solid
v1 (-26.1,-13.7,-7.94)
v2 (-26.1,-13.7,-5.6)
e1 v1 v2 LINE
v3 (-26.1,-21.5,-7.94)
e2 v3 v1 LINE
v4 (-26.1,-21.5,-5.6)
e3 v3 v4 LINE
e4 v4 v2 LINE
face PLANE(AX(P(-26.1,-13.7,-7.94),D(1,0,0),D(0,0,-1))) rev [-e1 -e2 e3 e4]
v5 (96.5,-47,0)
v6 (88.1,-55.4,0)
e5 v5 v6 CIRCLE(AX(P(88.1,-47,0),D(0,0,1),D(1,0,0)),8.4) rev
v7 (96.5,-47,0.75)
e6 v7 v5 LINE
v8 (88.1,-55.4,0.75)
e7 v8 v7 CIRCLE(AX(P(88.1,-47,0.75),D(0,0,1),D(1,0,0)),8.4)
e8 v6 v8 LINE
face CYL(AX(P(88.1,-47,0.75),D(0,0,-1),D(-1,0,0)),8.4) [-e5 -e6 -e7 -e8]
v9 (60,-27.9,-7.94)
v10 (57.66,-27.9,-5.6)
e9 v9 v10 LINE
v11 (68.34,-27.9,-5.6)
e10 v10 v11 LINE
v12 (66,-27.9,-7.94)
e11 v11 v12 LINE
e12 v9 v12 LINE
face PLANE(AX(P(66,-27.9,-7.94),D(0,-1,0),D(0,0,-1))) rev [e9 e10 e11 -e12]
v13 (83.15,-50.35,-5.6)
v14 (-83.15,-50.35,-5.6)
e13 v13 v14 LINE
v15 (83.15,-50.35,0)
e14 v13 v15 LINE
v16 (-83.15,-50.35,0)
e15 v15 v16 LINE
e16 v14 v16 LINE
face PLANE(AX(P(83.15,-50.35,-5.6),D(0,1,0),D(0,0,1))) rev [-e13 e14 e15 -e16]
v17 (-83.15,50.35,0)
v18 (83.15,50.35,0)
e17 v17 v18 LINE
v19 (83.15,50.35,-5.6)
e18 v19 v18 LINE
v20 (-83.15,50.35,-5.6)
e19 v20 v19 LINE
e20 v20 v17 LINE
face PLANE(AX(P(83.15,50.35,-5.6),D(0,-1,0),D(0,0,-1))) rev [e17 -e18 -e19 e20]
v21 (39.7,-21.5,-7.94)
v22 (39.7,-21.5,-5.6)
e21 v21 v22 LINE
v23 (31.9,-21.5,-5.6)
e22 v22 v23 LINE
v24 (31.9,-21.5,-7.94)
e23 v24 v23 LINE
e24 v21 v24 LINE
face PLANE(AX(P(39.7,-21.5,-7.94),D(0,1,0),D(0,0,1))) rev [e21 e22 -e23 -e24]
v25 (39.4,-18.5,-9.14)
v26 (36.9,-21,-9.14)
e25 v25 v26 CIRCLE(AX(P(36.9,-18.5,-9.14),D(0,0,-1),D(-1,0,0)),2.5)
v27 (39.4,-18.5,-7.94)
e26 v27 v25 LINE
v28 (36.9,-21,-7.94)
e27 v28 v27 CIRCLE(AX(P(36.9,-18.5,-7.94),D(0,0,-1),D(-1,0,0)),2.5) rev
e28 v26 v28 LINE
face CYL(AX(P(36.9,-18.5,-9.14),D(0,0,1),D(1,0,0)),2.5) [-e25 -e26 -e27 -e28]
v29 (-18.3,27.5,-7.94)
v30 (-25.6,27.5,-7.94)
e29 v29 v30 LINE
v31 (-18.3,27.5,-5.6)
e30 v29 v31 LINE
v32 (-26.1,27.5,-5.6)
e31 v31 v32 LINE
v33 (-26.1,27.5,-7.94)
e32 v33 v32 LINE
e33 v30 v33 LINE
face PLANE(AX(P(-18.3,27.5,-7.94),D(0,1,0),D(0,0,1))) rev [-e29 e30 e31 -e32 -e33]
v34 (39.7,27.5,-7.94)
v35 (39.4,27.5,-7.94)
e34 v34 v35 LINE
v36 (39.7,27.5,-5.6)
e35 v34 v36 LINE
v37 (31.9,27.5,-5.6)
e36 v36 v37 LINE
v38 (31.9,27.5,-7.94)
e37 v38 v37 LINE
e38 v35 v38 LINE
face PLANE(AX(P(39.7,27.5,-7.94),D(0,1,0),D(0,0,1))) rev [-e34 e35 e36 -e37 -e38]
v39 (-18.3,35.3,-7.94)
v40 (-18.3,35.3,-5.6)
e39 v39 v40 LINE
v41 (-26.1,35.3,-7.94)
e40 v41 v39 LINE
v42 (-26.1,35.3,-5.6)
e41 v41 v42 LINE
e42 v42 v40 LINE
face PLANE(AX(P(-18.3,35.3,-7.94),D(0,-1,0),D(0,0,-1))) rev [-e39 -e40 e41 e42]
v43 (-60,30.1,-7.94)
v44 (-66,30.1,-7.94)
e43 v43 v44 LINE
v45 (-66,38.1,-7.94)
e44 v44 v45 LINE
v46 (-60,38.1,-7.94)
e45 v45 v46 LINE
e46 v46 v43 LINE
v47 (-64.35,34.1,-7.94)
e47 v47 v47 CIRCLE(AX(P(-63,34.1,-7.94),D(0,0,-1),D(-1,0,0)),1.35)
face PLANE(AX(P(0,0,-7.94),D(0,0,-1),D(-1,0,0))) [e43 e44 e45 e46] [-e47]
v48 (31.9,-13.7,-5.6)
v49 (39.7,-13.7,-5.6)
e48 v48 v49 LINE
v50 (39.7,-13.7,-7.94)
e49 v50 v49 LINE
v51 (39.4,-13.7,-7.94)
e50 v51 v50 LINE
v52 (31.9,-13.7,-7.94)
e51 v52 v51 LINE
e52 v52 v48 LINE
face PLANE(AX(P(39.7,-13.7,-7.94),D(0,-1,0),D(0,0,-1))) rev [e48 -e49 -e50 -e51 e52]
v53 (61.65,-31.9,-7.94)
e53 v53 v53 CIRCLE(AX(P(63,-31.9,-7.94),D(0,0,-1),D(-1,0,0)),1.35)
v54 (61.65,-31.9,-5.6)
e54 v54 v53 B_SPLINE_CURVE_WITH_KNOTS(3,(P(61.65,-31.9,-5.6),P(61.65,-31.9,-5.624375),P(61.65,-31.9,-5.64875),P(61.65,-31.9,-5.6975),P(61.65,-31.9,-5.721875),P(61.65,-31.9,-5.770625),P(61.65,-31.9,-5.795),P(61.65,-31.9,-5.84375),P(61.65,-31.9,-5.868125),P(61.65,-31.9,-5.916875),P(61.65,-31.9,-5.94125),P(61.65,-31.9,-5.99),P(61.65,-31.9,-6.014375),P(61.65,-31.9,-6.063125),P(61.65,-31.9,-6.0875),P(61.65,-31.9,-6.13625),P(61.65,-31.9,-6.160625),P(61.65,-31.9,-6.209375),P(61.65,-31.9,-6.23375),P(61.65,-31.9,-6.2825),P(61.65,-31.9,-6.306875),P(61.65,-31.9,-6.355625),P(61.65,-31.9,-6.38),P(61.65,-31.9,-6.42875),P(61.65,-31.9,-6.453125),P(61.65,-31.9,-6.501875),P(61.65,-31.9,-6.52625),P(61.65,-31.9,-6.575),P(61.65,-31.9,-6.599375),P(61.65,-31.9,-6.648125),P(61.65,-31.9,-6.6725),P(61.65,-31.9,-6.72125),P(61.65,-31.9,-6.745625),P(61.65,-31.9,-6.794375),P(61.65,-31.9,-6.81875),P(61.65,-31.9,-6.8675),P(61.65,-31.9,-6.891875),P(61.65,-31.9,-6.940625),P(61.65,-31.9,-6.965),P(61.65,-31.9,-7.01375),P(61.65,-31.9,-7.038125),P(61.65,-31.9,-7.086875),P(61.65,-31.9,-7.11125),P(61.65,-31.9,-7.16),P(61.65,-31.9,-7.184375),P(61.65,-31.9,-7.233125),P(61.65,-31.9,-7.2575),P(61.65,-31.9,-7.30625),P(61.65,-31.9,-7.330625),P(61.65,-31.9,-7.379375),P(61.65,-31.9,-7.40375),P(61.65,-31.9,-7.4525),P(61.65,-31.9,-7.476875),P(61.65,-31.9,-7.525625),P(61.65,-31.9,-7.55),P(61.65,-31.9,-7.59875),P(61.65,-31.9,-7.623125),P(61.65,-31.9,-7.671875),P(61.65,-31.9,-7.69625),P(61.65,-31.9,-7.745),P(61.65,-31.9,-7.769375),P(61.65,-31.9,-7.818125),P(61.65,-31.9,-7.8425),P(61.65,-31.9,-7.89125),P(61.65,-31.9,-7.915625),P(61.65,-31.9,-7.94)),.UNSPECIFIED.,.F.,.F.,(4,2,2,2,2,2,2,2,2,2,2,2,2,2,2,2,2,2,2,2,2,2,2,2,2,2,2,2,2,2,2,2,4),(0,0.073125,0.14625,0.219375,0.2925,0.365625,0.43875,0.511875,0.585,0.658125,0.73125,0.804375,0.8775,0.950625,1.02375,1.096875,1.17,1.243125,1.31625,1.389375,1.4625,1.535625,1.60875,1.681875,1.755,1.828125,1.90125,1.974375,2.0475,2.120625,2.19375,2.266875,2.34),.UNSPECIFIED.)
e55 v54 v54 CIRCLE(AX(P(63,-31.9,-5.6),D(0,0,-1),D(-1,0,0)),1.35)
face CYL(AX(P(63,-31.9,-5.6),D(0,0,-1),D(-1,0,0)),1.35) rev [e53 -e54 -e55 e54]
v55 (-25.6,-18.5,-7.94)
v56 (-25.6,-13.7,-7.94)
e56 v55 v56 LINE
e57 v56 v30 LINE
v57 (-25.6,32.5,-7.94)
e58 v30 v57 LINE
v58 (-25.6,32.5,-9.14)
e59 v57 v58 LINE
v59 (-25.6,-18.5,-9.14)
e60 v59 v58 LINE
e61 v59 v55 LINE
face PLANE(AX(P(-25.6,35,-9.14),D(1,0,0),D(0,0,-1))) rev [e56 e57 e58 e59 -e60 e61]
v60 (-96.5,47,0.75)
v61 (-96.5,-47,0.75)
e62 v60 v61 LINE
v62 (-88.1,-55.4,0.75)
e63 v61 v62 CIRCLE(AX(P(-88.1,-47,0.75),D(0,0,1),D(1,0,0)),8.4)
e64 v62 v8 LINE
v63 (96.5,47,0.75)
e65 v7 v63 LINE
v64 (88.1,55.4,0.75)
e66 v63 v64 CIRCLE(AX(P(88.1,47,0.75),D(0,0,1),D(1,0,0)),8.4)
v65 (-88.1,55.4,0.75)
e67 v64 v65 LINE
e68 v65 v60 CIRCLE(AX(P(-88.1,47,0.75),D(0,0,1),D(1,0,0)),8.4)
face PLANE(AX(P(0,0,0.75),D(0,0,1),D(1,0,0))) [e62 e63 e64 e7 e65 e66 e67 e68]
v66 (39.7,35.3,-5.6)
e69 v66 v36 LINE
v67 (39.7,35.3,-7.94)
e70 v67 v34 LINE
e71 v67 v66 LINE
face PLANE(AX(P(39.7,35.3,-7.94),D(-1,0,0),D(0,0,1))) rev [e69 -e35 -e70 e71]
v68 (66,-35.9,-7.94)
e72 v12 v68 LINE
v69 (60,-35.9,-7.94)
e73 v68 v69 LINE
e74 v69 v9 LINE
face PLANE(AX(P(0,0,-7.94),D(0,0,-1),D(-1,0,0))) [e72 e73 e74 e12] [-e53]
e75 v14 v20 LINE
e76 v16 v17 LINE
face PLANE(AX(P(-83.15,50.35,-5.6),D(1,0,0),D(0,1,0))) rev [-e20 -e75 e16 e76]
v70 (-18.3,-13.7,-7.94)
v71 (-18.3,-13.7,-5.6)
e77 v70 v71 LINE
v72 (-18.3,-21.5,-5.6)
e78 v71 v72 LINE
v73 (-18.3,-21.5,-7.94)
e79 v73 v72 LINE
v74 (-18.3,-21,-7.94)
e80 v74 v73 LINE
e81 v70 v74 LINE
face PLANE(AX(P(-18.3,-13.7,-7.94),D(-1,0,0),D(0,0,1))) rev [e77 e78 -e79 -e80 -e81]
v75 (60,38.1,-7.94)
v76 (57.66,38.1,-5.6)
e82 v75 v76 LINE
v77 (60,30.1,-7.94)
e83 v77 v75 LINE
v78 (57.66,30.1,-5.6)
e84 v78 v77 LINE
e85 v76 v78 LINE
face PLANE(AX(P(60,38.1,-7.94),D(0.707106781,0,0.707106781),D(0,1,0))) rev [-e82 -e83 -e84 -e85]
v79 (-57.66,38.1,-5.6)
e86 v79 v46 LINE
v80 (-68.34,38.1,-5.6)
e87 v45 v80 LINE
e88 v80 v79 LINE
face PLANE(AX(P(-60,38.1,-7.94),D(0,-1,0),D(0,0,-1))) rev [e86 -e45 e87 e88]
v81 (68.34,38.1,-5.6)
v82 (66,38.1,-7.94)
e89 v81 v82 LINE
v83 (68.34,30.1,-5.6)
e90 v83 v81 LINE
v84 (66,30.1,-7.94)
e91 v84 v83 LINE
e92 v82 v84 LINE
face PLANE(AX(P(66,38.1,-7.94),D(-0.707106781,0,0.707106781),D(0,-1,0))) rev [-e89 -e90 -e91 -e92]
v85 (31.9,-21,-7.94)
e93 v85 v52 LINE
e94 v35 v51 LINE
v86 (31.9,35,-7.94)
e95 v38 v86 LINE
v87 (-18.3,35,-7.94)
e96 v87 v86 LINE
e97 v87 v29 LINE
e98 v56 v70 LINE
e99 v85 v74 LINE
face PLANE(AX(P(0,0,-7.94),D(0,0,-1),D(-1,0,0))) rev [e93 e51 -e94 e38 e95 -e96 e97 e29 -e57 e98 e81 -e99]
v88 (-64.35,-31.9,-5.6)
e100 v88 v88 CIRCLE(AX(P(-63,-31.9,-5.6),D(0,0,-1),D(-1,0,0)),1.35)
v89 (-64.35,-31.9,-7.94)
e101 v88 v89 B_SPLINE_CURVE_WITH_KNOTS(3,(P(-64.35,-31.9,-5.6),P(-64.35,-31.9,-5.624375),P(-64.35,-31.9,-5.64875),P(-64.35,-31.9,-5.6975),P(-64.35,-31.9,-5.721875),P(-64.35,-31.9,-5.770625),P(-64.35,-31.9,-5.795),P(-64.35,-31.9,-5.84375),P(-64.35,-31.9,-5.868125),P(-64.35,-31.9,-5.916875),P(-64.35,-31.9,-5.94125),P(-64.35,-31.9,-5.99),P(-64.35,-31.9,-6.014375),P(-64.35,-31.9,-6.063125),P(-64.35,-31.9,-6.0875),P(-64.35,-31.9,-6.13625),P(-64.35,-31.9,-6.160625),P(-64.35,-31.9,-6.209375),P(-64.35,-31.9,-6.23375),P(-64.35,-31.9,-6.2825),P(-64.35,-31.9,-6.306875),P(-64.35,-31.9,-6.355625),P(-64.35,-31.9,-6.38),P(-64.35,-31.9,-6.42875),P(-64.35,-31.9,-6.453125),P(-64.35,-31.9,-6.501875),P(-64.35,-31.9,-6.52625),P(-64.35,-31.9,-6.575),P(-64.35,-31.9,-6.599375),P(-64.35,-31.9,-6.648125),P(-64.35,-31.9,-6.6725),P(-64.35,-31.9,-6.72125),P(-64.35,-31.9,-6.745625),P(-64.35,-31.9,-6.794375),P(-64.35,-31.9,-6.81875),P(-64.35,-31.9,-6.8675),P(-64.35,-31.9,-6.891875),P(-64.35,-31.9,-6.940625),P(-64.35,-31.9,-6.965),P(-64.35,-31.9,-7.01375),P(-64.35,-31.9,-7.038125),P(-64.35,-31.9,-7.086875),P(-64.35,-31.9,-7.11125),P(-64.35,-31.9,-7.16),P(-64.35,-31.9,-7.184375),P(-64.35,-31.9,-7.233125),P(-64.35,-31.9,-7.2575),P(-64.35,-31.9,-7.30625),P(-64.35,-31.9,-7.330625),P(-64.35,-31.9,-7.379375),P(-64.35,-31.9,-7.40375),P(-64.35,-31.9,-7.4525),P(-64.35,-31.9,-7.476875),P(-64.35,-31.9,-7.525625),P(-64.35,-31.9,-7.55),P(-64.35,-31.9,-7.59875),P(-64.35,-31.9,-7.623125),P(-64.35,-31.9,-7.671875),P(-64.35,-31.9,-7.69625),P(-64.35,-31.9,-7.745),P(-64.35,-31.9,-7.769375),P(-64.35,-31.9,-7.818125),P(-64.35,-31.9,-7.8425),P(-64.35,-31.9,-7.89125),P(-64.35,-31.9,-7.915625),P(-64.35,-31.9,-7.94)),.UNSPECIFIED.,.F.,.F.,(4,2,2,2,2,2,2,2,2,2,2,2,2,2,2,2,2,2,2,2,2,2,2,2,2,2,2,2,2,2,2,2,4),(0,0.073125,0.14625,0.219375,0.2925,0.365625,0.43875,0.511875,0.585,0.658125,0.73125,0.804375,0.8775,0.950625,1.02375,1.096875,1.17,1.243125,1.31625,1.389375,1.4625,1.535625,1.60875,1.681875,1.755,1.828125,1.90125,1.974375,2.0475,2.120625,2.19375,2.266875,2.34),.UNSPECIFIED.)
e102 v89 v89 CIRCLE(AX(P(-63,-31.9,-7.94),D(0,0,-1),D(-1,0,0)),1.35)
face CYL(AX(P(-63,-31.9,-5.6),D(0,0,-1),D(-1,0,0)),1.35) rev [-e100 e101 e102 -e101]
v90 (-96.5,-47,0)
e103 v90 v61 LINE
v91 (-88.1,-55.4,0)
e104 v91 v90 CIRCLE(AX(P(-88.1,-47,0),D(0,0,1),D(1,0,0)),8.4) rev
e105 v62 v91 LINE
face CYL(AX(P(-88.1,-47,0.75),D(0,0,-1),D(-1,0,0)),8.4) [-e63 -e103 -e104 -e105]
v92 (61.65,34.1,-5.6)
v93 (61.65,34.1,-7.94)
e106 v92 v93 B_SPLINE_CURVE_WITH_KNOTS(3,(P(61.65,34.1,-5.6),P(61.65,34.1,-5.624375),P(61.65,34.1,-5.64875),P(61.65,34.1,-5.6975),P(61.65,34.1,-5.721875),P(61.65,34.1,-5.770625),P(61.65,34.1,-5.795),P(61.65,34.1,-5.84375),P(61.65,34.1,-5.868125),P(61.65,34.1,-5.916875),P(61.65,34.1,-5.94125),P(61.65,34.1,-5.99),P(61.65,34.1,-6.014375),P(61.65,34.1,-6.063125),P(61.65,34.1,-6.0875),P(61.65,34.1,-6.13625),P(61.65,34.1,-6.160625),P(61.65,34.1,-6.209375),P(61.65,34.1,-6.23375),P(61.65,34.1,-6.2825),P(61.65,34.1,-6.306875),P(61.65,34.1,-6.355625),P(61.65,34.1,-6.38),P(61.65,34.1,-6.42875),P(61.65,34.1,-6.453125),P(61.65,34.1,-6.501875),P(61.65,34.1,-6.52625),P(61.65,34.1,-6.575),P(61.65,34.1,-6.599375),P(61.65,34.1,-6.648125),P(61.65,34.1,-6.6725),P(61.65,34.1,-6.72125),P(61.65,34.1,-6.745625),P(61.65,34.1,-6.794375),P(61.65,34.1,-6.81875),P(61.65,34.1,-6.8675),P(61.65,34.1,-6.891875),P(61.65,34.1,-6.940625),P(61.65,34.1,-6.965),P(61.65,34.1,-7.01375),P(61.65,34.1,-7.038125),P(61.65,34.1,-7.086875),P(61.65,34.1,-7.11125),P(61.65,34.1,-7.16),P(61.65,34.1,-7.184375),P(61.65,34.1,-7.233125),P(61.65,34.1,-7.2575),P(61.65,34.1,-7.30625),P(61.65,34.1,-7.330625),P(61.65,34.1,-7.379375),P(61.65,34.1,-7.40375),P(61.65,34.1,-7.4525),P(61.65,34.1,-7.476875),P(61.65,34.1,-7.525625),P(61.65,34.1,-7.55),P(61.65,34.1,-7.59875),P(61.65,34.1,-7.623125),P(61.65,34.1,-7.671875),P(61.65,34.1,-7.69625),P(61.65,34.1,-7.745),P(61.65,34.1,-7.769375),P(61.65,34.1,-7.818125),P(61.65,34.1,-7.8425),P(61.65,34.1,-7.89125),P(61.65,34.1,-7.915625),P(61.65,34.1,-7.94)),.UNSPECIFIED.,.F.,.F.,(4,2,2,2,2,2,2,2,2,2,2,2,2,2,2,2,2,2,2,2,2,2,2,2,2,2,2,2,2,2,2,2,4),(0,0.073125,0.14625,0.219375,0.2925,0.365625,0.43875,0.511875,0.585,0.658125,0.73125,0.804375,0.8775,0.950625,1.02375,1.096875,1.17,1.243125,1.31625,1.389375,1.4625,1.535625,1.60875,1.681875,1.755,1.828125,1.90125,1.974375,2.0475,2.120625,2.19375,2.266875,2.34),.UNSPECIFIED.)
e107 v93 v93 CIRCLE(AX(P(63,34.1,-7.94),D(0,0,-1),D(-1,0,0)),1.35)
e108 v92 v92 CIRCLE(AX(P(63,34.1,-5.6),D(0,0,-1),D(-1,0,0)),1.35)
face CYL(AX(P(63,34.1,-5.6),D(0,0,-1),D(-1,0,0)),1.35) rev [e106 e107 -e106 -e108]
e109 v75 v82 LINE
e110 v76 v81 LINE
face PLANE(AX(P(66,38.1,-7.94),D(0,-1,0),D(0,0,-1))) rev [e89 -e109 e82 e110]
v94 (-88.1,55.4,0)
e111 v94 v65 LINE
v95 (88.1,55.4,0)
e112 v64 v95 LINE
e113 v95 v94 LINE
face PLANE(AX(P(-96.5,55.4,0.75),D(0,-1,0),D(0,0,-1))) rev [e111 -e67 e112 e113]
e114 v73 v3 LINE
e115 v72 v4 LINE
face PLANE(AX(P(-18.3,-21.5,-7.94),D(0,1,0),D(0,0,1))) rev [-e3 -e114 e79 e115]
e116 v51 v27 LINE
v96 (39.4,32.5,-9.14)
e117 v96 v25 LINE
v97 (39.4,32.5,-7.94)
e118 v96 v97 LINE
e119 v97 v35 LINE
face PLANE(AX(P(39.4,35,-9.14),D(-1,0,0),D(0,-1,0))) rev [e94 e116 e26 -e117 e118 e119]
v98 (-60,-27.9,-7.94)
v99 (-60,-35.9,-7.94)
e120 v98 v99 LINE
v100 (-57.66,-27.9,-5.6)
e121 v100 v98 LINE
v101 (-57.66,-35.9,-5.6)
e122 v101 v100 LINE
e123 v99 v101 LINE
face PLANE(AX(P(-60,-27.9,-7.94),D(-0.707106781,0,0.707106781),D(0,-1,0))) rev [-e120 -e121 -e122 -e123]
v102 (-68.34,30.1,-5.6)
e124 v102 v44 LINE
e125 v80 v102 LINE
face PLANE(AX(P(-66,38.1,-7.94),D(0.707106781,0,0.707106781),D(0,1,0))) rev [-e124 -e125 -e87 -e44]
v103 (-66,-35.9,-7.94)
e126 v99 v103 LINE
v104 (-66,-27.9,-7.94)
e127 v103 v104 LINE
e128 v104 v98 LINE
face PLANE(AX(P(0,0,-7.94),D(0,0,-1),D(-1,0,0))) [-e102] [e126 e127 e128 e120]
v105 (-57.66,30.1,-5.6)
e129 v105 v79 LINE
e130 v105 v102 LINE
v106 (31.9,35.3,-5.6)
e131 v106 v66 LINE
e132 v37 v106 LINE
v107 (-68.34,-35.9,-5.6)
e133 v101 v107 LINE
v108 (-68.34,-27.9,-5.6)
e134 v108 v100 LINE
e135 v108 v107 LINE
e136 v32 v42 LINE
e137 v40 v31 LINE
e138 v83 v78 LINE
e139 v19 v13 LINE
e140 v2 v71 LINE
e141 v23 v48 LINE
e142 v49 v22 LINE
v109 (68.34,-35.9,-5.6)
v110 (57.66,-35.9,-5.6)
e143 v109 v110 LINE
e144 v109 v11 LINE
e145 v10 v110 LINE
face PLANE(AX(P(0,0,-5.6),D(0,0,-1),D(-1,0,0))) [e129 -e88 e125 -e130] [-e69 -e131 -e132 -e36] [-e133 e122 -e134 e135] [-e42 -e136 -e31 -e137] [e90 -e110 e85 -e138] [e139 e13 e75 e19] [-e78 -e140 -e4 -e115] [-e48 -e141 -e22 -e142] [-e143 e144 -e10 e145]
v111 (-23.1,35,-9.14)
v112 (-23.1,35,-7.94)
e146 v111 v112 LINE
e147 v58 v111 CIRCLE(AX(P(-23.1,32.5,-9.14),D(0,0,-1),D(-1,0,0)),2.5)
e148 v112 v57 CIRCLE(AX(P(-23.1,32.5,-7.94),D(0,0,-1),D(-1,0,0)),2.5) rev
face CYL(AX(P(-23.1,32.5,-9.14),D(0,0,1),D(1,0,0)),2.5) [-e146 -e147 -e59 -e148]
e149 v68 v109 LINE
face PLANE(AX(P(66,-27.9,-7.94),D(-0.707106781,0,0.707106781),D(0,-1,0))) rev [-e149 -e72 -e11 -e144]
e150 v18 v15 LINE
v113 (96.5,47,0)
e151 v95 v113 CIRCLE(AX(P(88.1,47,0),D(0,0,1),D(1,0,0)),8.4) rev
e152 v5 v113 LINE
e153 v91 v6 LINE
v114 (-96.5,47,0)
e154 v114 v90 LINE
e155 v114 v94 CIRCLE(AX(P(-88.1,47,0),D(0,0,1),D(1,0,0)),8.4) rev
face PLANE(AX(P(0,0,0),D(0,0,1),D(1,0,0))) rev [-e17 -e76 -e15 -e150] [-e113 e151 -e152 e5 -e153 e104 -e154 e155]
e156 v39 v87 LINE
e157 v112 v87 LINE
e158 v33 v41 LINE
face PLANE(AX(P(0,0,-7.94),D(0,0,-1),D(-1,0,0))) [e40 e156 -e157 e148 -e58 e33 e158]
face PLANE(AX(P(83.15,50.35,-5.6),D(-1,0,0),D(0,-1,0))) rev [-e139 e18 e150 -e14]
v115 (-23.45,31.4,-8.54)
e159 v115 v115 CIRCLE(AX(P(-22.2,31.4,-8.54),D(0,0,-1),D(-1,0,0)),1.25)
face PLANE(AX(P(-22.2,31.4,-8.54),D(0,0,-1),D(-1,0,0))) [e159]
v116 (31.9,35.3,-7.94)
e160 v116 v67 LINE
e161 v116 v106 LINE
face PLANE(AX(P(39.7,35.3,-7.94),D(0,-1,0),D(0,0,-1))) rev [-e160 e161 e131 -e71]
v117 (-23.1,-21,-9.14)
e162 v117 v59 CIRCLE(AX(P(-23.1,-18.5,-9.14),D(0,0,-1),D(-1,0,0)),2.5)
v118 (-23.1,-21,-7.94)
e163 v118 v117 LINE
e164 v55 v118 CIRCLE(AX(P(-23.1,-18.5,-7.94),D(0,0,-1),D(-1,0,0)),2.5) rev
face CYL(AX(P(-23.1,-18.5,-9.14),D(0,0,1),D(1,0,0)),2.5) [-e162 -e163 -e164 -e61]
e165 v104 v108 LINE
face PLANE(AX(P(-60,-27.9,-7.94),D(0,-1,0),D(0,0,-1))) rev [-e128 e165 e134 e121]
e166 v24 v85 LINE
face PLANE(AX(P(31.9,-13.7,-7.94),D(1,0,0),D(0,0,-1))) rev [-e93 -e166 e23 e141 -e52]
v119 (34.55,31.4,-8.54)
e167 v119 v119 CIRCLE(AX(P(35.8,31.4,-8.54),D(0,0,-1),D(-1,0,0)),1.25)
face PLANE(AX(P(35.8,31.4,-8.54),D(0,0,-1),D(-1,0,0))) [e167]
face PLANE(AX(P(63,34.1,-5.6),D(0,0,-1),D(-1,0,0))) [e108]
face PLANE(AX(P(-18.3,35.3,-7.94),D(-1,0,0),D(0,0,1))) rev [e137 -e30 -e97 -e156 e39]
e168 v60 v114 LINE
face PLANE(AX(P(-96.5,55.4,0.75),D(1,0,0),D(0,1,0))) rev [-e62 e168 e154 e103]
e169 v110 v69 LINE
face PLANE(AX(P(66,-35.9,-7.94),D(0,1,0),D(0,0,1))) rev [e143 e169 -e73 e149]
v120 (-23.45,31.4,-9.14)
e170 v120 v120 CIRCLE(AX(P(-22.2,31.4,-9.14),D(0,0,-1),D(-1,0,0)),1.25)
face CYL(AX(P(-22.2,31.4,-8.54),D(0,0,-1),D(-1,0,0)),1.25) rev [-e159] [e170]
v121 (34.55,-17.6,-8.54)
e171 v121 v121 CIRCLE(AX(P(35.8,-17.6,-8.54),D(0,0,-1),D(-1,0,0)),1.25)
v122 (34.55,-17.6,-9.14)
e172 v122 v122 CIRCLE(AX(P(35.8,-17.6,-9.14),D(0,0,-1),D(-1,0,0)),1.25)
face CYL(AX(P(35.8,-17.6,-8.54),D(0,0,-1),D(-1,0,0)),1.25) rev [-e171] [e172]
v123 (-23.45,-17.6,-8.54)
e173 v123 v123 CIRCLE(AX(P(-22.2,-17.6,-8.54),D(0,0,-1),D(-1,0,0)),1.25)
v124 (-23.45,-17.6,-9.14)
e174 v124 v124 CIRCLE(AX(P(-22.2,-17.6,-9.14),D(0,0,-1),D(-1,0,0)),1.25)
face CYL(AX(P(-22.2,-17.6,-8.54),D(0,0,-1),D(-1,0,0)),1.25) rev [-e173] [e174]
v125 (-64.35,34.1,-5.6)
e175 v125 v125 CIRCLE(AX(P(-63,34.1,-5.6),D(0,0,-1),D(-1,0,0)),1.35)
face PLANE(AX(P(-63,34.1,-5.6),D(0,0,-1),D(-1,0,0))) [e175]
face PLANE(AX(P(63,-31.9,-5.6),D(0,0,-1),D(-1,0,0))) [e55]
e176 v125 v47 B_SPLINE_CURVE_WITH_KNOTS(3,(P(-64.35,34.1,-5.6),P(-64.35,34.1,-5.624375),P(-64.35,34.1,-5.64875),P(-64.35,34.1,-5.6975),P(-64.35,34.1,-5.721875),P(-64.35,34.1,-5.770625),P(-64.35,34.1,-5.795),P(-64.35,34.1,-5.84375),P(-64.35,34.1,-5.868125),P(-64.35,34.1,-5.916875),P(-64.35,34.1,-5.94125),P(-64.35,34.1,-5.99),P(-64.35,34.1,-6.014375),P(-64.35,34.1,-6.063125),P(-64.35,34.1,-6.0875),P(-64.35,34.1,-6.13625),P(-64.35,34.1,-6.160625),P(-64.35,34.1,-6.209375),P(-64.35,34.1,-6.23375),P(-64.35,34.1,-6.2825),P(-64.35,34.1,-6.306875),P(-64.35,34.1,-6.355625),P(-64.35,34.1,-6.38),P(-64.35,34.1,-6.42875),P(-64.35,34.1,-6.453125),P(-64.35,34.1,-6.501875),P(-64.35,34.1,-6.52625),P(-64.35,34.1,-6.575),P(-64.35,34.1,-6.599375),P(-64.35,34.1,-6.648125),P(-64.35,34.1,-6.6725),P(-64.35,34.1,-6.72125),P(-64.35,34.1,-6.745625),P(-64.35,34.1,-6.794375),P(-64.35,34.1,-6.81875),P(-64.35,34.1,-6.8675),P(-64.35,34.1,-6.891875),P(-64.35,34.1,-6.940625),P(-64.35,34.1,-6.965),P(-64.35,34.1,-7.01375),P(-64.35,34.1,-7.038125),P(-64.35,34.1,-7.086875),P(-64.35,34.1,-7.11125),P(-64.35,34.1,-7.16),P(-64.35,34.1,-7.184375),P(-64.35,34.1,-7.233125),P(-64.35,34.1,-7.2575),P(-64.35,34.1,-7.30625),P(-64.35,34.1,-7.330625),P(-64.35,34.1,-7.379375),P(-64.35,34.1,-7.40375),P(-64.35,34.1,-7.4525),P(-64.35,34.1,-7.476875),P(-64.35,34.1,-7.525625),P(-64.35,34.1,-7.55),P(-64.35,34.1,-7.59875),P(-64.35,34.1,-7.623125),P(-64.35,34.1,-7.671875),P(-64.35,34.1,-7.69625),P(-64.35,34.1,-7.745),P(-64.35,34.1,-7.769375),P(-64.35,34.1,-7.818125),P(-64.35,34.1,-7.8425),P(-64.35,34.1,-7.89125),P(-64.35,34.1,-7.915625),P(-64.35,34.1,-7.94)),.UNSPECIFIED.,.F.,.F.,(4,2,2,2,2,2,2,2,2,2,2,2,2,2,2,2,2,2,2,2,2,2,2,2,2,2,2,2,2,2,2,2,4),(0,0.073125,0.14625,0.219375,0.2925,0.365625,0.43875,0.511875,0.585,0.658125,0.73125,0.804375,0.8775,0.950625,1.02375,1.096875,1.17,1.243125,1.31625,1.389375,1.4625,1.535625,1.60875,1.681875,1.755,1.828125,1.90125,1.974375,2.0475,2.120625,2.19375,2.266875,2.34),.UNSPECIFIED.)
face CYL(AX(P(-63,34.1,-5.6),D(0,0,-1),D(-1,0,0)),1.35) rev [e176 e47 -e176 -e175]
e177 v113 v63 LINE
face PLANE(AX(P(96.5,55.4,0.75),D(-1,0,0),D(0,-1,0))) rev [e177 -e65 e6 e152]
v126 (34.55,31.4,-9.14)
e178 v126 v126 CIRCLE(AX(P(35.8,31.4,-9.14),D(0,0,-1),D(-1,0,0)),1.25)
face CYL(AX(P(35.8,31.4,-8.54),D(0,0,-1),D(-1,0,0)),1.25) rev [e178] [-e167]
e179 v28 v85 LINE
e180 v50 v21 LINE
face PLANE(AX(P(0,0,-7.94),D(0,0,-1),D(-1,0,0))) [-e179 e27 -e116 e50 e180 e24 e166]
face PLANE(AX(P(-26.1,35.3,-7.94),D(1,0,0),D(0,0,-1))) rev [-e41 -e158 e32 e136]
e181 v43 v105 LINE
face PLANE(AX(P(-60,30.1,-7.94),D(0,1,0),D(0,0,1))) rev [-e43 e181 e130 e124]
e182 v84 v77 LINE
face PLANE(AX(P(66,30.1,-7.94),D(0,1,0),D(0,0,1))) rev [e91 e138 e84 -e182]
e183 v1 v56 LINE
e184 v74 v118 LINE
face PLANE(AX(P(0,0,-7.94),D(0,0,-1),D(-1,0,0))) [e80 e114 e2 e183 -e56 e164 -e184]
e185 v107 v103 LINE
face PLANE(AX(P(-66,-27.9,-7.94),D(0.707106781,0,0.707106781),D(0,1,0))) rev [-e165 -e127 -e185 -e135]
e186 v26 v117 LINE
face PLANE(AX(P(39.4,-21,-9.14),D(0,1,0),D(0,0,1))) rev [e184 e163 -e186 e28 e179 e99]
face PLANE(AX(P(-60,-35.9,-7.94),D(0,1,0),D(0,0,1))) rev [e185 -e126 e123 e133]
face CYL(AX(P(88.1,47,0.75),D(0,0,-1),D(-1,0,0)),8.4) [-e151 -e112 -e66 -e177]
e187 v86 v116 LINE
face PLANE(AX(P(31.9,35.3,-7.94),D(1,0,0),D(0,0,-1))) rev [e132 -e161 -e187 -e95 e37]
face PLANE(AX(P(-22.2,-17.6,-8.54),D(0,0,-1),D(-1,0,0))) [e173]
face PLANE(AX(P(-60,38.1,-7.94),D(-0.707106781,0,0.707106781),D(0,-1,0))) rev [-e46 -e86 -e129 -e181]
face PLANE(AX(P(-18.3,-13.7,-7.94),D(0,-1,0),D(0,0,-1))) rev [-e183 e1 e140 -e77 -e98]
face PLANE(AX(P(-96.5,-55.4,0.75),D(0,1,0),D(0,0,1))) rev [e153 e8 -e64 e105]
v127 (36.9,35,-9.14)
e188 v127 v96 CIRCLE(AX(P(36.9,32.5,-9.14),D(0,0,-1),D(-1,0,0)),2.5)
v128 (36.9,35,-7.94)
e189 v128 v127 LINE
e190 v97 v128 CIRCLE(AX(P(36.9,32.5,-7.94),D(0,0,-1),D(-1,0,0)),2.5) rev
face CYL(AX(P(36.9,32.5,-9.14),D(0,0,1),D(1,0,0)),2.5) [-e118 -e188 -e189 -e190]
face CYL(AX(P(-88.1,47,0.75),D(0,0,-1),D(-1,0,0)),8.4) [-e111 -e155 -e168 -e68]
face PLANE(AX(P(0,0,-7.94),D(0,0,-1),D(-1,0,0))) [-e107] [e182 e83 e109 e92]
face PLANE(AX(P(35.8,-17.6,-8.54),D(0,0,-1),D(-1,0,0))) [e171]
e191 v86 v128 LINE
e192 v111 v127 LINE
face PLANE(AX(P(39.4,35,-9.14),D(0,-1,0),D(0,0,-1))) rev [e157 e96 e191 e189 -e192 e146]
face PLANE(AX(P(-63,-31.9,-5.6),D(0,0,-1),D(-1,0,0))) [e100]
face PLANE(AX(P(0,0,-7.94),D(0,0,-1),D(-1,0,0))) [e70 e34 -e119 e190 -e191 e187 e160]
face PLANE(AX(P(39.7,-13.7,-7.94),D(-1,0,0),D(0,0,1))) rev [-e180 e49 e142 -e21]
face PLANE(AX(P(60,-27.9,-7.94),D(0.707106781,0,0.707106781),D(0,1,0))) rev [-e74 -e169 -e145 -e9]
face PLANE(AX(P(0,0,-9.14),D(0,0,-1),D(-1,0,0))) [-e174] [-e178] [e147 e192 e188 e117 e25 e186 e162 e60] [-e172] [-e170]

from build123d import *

# Parameters (mm, degrees)
SKETCH_1_W          = 193
SKETCH_1_H          = 110.8
EXTRUDE_1_DEPTH     = 0.75
FILLET_1_R          = 8.4
SKETCH_2_W          = 166.3
SKETCH_2_H          = 100.7
EXTRUDE_2_DEPTH     = 5.6
SKETCH_3_W          = 6
SKETCH_3_H          = 8
EXTRUDE_3_DEPTH     = 2.34
CHAMFER_1_SIZE      = 2.34
SKETCH_4_R          = 1.35
CUT_EXTRUDE_1_DEPTH = 2.34
SKETCH_5_W          = 7.8
SKETCH_5_H          = 7.8
EXTRUDE_4_DEPTH     = 2.34
SKETCH_6_W          = 65
SKETCH_6_H          = 56
EXTRUDE_5_DEPTH     = 1.2
FILLET_2_R          = 2.5
SKETCH_7_R          = 1.25
CUT_EXTRUDE_2_DEPTH = 0.6


with BuildPart() as part:
    # 草图1 → 凸台-拉伸1 (new body)
    with BuildSketch(Plane.XY):
        Rectangle(SKETCH_1_W, SKETCH_1_H)
    extrude(amount=EXTRUDE_1_DEPTH)

    # 圆角1
    fillet_1_edges = [part.edges().sort_by_distance(p)[0] for p in [
        (96.5, -55.4, 0.375),
        (-96.5, -55.4, 0.375),
        (-96.5, 55.4, 0.375),
        (96.5, 55.4, 0.375),
    ]]
    fillet(fillet_1_edges, radius=FILLET_1_R)

    # 草图2 → 凸台-拉伸2 (add)
    with BuildSketch(Plane(origin=(0, 0, 0), x_dir=(-1, 0, 0), z_dir=(0, 0, -1))):
        Rectangle(SKETCH_2_W, SKETCH_2_H)
    extrude(amount=EXTRUDE_2_DEPTH)

    # 草图3 → 凸台-拉伸3 (add)
    with BuildSketch(Plane(origin=(0, 0, -5.6), x_dir=(-1, 0, 0), z_dir=(0, 0, -1))):
        with Locations((-63, 34.1)):
            Rectangle(SKETCH_3_W, SKETCH_3_H)
        with Locations((-63, -31.9)):
            Rectangle(SKETCH_3_W, SKETCH_3_H)
        with Locations((63, 34.1)):
            Rectangle(SKETCH_3_W, SKETCH_3_H)
        with Locations((63, -31.9)):
            Rectangle(SKETCH_3_W, SKETCH_3_H)
    extrude(amount=EXTRUDE_3_DEPTH)

    # 倒角1
    chamfer_1_edges = [part.edges().sort_by_distance(p)[0] for p in [
        (66, -31.9, -5.6),
        (60, -31.9, -5.6),
        (-66, -31.9, -5.6),
        (-60, -31.9, -5.6),
        (-60, 34.1, -5.6),
        (-66, 34.1, -5.6),
        (60, 34.1, -5.6),
        (66, 34.1, -5.6),
    ]]
    chamfer(chamfer_1_edges, length=CHAMFER_1_SIZE - 0.0001)  # a hair under: the kernel refuses the full size

    # 草图4 → 切除-拉伸1 (cut)
    with BuildSketch(Plane(origin=(0, 0, -7.94), x_dir=(-1, 0, 0), z_dir=(0, 0, -1))):
        with Locations((-63, 34.1)):
            Circle(SKETCH_4_R)
        with Locations((-63, -31.9)):
            Circle(SKETCH_4_R)
        with Locations((63, -31.9)):
            Circle(SKETCH_4_R)
        with Locations((63, 34.1)):
            Circle(SKETCH_4_R)
    extrude(amount=-CUT_EXTRUDE_1_DEPTH, mode=Mode.SUBTRACT)

    # 草图5 → 凸台-拉伸4 (add)
    with BuildSketch(Plane(origin=(0, 0, -5.6), x_dir=(-1, 0, 0), z_dir=(0, 0, -1))):
        with Locations((-35.8, 31.4)):
            Rectangle(SKETCH_5_W, SKETCH_5_H)
        with Locations((22.2, 31.4)):
            Rectangle(SKETCH_5_W, SKETCH_5_H)
        with Locations((-35.8, -17.6)):
            Rectangle(SKETCH_5_W, SKETCH_5_H)
        with Locations((22.2, -17.6)):
            Rectangle(SKETCH_5_W, SKETCH_5_H)
    extrude(amount=EXTRUDE_4_DEPTH)

    # 草图6 → 凸台-拉伸5 (add)
    with BuildSketch(Plane(origin=(0, 0, -7.94), x_dir=(-1, 0, 0), z_dir=(0, 0, -1))):
        with Locations((-6.9, 7)):
            Rectangle(SKETCH_6_W, SKETCH_6_H)
    extrude(amount=EXTRUDE_5_DEPTH)

    # 圆角2
    fillet_2_edges = [part.edges().sort_by_distance(p)[0] for p in [
        (-25.6, -21, -8.54),
        (-25.6, 35, -8.54),
        (39.4, 35, -8.54),
        (39.4, -21, -8.54),
    ]]
    fillet(fillet_2_edges, radius=FILLET_2_R)

    # 草图7 → 切除-拉伸2 (cut)
    with BuildSketch(Plane(origin=(0, 0, -9.14), x_dir=(-1, 0, 0), z_dir=(0, 0, -1))):
        with Locations((-35.8, 31.4)):
            Circle(SKETCH_7_R)
        with Locations((22.2, 31.4)):
            Circle(SKETCH_7_R)
        with Locations((-35.8, -17.6)):
            Circle(SKETCH_7_R)
        with Locations((22.2, -17.6)):
            Circle(SKETCH_7_R)
    extrude(amount=-CUT_EXTRUDE_2_DEPTH, mode=Mode.SUBTRACT)


solid = part.part
